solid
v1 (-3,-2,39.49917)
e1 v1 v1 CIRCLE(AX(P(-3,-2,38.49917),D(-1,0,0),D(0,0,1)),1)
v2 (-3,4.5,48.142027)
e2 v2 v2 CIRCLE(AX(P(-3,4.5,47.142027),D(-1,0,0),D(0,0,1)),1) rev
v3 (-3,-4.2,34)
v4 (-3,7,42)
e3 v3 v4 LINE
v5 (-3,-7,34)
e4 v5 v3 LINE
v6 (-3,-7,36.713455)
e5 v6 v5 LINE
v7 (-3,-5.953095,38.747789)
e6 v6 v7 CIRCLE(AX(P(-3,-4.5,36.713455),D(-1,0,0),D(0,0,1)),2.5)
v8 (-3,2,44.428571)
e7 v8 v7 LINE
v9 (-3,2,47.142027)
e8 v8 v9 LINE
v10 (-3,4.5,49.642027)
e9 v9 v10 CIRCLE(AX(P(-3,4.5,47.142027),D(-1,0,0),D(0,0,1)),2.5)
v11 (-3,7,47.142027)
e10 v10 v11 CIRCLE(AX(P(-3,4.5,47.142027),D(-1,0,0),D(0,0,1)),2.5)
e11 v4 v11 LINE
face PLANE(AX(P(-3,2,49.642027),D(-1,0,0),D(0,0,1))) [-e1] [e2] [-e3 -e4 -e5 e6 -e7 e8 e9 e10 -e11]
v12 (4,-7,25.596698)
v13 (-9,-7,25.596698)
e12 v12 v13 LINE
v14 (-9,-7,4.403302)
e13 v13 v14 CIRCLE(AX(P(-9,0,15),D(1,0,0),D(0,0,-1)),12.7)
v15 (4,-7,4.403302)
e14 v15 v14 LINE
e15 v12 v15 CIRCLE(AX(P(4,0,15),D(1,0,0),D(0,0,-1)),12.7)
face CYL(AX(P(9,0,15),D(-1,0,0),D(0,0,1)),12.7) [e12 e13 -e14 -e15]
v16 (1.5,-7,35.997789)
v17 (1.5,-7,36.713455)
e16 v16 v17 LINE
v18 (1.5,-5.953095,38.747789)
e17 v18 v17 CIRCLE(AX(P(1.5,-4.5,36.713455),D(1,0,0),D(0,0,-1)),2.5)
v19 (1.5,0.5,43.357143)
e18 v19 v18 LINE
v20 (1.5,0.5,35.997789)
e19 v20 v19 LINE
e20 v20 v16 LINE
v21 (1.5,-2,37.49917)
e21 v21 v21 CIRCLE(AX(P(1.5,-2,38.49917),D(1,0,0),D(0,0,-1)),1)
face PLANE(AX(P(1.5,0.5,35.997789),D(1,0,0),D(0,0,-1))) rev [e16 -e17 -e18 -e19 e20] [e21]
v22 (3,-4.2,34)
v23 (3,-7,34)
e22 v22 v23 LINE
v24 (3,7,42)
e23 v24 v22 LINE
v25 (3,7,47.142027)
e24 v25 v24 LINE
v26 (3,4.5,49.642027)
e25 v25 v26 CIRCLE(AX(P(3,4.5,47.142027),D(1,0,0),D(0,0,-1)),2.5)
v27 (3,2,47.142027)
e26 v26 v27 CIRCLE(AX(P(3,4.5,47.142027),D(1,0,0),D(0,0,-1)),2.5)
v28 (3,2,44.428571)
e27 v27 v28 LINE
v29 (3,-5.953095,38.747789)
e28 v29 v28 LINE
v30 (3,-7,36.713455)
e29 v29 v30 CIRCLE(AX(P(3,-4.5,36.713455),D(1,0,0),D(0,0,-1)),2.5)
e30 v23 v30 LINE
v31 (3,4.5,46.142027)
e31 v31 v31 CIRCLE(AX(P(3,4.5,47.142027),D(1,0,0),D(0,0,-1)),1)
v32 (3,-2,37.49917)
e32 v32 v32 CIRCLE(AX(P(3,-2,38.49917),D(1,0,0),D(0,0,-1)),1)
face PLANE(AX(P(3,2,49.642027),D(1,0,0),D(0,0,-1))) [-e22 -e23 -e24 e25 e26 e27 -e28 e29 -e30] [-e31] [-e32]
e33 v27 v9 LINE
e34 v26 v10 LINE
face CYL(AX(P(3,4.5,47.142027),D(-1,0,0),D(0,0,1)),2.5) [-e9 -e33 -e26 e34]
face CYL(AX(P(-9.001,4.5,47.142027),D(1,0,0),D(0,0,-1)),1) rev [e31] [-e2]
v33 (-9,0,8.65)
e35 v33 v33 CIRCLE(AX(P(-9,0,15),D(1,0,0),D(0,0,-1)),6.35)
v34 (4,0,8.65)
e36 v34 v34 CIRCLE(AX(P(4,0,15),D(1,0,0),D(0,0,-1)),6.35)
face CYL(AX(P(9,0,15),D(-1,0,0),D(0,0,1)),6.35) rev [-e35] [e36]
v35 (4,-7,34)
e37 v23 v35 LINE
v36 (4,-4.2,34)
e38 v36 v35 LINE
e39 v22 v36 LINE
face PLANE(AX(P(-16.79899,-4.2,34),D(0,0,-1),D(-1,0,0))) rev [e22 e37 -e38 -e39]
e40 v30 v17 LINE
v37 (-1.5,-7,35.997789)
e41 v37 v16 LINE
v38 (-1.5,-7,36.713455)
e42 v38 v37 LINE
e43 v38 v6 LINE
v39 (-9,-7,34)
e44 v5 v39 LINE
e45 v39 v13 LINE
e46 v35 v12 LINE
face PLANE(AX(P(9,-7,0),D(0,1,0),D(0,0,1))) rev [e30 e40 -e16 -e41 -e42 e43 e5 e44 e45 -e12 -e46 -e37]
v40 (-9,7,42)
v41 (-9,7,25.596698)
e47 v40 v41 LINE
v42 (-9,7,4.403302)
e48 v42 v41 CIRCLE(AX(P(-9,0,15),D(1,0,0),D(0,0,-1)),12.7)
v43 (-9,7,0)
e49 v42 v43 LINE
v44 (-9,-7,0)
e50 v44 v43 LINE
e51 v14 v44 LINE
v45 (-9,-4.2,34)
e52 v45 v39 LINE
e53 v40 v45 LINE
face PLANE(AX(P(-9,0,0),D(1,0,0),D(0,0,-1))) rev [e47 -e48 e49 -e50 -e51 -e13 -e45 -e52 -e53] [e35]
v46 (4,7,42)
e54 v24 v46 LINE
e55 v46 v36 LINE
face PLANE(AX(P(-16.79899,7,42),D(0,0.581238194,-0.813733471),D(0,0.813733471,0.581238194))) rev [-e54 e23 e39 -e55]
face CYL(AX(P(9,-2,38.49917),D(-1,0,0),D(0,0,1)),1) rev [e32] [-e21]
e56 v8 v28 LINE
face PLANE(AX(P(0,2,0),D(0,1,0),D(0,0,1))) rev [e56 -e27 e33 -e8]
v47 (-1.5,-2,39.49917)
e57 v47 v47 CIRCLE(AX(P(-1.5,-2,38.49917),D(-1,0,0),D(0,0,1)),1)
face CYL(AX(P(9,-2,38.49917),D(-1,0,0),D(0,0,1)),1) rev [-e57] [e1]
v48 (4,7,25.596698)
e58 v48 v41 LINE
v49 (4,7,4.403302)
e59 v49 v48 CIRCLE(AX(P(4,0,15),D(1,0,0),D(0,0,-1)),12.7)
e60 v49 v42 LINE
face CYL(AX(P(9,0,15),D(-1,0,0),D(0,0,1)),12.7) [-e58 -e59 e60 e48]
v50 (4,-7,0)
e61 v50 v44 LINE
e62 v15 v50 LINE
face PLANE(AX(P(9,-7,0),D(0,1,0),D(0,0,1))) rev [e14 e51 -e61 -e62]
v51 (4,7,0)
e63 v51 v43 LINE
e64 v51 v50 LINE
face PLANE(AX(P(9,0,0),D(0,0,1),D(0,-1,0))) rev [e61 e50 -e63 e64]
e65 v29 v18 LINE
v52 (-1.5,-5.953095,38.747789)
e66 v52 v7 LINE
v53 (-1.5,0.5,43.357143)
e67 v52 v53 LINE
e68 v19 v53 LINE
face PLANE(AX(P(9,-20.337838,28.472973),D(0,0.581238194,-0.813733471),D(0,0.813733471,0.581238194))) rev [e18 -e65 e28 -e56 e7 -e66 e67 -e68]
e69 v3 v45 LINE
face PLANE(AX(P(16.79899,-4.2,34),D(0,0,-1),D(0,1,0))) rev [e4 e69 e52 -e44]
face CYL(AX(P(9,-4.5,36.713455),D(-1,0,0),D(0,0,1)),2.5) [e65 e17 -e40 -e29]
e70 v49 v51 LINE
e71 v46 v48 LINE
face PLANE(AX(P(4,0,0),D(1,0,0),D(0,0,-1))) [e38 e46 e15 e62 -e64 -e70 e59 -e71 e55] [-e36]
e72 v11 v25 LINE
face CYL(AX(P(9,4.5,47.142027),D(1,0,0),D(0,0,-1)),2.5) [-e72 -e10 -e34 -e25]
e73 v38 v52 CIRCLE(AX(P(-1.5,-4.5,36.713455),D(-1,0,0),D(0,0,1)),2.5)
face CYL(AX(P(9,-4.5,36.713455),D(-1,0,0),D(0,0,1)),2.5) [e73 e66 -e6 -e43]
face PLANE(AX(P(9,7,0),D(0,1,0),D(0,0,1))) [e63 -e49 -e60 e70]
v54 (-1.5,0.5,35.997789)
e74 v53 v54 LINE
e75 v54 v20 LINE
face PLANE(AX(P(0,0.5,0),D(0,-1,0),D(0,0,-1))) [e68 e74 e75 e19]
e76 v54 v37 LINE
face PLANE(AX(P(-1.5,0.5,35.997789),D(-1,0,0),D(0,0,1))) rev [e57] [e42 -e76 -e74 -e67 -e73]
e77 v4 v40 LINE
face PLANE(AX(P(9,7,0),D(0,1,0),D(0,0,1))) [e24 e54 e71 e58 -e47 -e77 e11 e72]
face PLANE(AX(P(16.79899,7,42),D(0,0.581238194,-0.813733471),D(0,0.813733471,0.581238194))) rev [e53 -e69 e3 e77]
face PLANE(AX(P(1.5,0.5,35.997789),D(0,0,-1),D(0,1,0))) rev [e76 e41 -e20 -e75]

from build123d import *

# Parameters (mm, degrees)
SKETCH1_R           = 1
SKETCH1_R_2         = 6.35
BOSS_EXTRUDE1_DEPTH = 9
SKETCH2_W           = 6
SKETCH2_H           = 6.5
BOSS_EXTRUDE2_DEPTH = 5
CUT_EXTRUDE1_REACH  = 54.627
SKETCH3_R           = 1
FILLET1_R           = 2.5
SKETCH4_W           = 3
SKETCH4_H           = 8
CUT_EXTRUDE3_DEPTH  = 7.5
CUT_EXTRUDE8_DEPTH  = 6
CUT_EXTRUDE9_DEPTH  = 6
SKETCH9_W           = 49.64202669
SKETCH9_H           = 25.4
CUT_EXTRUDE11_DEPTH = 5


with BuildPart() as part:
    # Sketch1 → Boss-Extrude1 (new, symmetric)
    with BuildSketch(Plane(origin=(0, 0, 0), x_dir=(0, 0, -1), z_dir=(1, 0, 0))):
        with BuildLine():
            Line((-45.176360368, 3.046904516), (-38.74778894, -5.953095484))
            ThreePointArc((-38.74778894, -5.953095484), (-37.857409214, -6.722919107), (-36.713455262, -7))
            Line((-36.713455262, -7), (-25.596697599, -7))
            ThreePointArc((-25.596697599, -7), (-15, -12.7), (-4.403302401, -7))
            Line((-4.403302401, -7), (0, -7))
            Line((0, -7), (0, 7))
            Line((0, 7), (-4.403302401, 7))
            ThreePointArc((-4.403302401, 7), (-15, 12.7), (-25.596697599, 7))
            Line((-25.596697599, 7), (-43.14202669, 7))
            ThreePointArc((-43.14202669, 7), (-45.364945797, 5.643953952), (-45.176360368, 3.046904516))
        make_face()
        with Locations((-38.499169547, -2)):
            Circle(SKETCH1_R, mode=Mode.SUBTRACT)
        with Locations((-15, 0)):
            Circle(SKETCH1_R_2, mode=Mode.SUBTRACT)
    extrude(amount=BOSS_EXTRUDE1_DEPTH, both=True)

    # Sketch2 → Boss-Extrude2 (add)
    with BuildSketch(Plane(origin=(0, 7, 0), x_dir=(1, 0, 0), z_dir=(0, 1, 0))):
        with Locations((0, -46.39202669)):
            Rectangle(SKETCH2_W, SKETCH2_H)
    extrude(amount=-BOSS_EXTRUDE2_DEPTH)

    # Sketch3 → Cut-Extrude1 (cut, up to next)
    with BuildSketch(Plane(origin=(3, 0, 0), x_dir=(0, 0, -1), z_dir=(1, 0, 0)), mode=Mode.PRIVATE) as cut_extrude1_sk1:
        with Locations((-47.14202669, 4.5)):
            Circle(SKETCH3_R)
    cut_extrude1_tool1 = extrude(cut_extrude1_sk1.sketch, amount=-CUT_EXTRUDE1_REACH, mode=Mode.PRIVATE) & part.part
    add(cut_extrude1_tool1.solids().sort_by_distance((3, 4.5, 47.142027))[0], mode=Mode.SUBTRACT)

    # Fillet1
    fillet1_edges = [part.edges().sort_by_distance(p)[0] for p in [
        (0, 2, 49.64202669),
        (0, 7, 49.64202669),
    ]]
    fillet(fillet1_edges, radius=FILLET1_R - 0.0001)  # a hair under: the kernel refuses the full size

    # Sketch4 → Cut-Extrude3 (cut)
    with BuildSketch(Plane.XZ.offset(7)):
        with Locations((0, 39.99778894)):
            Rectangle(SKETCH4_W, SKETCH4_H)
    extrude(amount=-CUT_EXTRUDE3_DEPTH, mode=Mode.SUBTRACT)

    # Sketch6 → Cut-Extrude8 (cut)
    with BuildSketch(Plane(origin=(9, 0, 0), x_dir=(0, 0, -1), z_dir=(1, 0, 0))):
        Polygon((-48, 7), (-38, -7), (-34, -7), (-34, -4.2), (-42, 7), align=None)
    extrude(amount=-CUT_EXTRUDE8_DEPTH, mode=Mode.SUBTRACT)

    # Sketch8 → Cut-Extrude9 (cut)
    with BuildSketch(Plane.ZY.offset(9)):
        Polygon((38, -7), (48, 7), (42, 7), (34, -4.2), (34, -7), align=None)
    extrude(amount=-CUT_EXTRUDE9_DEPTH, mode=Mode.SUBTRACT)

    # Sketch9 → Cut-Extrude11 (cut)
    with BuildSketch(Plane(origin=(9, 0, 0), x_dir=(0, 0, -1), z_dir=(1, 0, 0))):
        with Locations((-24.821013345, 0)):
            Rectangle(SKETCH9_W, SKETCH9_H)
    extrude(amount=-CUT_EXTRUDE11_DEPTH, mode=Mode.SUBTRACT)


solid = part.part
